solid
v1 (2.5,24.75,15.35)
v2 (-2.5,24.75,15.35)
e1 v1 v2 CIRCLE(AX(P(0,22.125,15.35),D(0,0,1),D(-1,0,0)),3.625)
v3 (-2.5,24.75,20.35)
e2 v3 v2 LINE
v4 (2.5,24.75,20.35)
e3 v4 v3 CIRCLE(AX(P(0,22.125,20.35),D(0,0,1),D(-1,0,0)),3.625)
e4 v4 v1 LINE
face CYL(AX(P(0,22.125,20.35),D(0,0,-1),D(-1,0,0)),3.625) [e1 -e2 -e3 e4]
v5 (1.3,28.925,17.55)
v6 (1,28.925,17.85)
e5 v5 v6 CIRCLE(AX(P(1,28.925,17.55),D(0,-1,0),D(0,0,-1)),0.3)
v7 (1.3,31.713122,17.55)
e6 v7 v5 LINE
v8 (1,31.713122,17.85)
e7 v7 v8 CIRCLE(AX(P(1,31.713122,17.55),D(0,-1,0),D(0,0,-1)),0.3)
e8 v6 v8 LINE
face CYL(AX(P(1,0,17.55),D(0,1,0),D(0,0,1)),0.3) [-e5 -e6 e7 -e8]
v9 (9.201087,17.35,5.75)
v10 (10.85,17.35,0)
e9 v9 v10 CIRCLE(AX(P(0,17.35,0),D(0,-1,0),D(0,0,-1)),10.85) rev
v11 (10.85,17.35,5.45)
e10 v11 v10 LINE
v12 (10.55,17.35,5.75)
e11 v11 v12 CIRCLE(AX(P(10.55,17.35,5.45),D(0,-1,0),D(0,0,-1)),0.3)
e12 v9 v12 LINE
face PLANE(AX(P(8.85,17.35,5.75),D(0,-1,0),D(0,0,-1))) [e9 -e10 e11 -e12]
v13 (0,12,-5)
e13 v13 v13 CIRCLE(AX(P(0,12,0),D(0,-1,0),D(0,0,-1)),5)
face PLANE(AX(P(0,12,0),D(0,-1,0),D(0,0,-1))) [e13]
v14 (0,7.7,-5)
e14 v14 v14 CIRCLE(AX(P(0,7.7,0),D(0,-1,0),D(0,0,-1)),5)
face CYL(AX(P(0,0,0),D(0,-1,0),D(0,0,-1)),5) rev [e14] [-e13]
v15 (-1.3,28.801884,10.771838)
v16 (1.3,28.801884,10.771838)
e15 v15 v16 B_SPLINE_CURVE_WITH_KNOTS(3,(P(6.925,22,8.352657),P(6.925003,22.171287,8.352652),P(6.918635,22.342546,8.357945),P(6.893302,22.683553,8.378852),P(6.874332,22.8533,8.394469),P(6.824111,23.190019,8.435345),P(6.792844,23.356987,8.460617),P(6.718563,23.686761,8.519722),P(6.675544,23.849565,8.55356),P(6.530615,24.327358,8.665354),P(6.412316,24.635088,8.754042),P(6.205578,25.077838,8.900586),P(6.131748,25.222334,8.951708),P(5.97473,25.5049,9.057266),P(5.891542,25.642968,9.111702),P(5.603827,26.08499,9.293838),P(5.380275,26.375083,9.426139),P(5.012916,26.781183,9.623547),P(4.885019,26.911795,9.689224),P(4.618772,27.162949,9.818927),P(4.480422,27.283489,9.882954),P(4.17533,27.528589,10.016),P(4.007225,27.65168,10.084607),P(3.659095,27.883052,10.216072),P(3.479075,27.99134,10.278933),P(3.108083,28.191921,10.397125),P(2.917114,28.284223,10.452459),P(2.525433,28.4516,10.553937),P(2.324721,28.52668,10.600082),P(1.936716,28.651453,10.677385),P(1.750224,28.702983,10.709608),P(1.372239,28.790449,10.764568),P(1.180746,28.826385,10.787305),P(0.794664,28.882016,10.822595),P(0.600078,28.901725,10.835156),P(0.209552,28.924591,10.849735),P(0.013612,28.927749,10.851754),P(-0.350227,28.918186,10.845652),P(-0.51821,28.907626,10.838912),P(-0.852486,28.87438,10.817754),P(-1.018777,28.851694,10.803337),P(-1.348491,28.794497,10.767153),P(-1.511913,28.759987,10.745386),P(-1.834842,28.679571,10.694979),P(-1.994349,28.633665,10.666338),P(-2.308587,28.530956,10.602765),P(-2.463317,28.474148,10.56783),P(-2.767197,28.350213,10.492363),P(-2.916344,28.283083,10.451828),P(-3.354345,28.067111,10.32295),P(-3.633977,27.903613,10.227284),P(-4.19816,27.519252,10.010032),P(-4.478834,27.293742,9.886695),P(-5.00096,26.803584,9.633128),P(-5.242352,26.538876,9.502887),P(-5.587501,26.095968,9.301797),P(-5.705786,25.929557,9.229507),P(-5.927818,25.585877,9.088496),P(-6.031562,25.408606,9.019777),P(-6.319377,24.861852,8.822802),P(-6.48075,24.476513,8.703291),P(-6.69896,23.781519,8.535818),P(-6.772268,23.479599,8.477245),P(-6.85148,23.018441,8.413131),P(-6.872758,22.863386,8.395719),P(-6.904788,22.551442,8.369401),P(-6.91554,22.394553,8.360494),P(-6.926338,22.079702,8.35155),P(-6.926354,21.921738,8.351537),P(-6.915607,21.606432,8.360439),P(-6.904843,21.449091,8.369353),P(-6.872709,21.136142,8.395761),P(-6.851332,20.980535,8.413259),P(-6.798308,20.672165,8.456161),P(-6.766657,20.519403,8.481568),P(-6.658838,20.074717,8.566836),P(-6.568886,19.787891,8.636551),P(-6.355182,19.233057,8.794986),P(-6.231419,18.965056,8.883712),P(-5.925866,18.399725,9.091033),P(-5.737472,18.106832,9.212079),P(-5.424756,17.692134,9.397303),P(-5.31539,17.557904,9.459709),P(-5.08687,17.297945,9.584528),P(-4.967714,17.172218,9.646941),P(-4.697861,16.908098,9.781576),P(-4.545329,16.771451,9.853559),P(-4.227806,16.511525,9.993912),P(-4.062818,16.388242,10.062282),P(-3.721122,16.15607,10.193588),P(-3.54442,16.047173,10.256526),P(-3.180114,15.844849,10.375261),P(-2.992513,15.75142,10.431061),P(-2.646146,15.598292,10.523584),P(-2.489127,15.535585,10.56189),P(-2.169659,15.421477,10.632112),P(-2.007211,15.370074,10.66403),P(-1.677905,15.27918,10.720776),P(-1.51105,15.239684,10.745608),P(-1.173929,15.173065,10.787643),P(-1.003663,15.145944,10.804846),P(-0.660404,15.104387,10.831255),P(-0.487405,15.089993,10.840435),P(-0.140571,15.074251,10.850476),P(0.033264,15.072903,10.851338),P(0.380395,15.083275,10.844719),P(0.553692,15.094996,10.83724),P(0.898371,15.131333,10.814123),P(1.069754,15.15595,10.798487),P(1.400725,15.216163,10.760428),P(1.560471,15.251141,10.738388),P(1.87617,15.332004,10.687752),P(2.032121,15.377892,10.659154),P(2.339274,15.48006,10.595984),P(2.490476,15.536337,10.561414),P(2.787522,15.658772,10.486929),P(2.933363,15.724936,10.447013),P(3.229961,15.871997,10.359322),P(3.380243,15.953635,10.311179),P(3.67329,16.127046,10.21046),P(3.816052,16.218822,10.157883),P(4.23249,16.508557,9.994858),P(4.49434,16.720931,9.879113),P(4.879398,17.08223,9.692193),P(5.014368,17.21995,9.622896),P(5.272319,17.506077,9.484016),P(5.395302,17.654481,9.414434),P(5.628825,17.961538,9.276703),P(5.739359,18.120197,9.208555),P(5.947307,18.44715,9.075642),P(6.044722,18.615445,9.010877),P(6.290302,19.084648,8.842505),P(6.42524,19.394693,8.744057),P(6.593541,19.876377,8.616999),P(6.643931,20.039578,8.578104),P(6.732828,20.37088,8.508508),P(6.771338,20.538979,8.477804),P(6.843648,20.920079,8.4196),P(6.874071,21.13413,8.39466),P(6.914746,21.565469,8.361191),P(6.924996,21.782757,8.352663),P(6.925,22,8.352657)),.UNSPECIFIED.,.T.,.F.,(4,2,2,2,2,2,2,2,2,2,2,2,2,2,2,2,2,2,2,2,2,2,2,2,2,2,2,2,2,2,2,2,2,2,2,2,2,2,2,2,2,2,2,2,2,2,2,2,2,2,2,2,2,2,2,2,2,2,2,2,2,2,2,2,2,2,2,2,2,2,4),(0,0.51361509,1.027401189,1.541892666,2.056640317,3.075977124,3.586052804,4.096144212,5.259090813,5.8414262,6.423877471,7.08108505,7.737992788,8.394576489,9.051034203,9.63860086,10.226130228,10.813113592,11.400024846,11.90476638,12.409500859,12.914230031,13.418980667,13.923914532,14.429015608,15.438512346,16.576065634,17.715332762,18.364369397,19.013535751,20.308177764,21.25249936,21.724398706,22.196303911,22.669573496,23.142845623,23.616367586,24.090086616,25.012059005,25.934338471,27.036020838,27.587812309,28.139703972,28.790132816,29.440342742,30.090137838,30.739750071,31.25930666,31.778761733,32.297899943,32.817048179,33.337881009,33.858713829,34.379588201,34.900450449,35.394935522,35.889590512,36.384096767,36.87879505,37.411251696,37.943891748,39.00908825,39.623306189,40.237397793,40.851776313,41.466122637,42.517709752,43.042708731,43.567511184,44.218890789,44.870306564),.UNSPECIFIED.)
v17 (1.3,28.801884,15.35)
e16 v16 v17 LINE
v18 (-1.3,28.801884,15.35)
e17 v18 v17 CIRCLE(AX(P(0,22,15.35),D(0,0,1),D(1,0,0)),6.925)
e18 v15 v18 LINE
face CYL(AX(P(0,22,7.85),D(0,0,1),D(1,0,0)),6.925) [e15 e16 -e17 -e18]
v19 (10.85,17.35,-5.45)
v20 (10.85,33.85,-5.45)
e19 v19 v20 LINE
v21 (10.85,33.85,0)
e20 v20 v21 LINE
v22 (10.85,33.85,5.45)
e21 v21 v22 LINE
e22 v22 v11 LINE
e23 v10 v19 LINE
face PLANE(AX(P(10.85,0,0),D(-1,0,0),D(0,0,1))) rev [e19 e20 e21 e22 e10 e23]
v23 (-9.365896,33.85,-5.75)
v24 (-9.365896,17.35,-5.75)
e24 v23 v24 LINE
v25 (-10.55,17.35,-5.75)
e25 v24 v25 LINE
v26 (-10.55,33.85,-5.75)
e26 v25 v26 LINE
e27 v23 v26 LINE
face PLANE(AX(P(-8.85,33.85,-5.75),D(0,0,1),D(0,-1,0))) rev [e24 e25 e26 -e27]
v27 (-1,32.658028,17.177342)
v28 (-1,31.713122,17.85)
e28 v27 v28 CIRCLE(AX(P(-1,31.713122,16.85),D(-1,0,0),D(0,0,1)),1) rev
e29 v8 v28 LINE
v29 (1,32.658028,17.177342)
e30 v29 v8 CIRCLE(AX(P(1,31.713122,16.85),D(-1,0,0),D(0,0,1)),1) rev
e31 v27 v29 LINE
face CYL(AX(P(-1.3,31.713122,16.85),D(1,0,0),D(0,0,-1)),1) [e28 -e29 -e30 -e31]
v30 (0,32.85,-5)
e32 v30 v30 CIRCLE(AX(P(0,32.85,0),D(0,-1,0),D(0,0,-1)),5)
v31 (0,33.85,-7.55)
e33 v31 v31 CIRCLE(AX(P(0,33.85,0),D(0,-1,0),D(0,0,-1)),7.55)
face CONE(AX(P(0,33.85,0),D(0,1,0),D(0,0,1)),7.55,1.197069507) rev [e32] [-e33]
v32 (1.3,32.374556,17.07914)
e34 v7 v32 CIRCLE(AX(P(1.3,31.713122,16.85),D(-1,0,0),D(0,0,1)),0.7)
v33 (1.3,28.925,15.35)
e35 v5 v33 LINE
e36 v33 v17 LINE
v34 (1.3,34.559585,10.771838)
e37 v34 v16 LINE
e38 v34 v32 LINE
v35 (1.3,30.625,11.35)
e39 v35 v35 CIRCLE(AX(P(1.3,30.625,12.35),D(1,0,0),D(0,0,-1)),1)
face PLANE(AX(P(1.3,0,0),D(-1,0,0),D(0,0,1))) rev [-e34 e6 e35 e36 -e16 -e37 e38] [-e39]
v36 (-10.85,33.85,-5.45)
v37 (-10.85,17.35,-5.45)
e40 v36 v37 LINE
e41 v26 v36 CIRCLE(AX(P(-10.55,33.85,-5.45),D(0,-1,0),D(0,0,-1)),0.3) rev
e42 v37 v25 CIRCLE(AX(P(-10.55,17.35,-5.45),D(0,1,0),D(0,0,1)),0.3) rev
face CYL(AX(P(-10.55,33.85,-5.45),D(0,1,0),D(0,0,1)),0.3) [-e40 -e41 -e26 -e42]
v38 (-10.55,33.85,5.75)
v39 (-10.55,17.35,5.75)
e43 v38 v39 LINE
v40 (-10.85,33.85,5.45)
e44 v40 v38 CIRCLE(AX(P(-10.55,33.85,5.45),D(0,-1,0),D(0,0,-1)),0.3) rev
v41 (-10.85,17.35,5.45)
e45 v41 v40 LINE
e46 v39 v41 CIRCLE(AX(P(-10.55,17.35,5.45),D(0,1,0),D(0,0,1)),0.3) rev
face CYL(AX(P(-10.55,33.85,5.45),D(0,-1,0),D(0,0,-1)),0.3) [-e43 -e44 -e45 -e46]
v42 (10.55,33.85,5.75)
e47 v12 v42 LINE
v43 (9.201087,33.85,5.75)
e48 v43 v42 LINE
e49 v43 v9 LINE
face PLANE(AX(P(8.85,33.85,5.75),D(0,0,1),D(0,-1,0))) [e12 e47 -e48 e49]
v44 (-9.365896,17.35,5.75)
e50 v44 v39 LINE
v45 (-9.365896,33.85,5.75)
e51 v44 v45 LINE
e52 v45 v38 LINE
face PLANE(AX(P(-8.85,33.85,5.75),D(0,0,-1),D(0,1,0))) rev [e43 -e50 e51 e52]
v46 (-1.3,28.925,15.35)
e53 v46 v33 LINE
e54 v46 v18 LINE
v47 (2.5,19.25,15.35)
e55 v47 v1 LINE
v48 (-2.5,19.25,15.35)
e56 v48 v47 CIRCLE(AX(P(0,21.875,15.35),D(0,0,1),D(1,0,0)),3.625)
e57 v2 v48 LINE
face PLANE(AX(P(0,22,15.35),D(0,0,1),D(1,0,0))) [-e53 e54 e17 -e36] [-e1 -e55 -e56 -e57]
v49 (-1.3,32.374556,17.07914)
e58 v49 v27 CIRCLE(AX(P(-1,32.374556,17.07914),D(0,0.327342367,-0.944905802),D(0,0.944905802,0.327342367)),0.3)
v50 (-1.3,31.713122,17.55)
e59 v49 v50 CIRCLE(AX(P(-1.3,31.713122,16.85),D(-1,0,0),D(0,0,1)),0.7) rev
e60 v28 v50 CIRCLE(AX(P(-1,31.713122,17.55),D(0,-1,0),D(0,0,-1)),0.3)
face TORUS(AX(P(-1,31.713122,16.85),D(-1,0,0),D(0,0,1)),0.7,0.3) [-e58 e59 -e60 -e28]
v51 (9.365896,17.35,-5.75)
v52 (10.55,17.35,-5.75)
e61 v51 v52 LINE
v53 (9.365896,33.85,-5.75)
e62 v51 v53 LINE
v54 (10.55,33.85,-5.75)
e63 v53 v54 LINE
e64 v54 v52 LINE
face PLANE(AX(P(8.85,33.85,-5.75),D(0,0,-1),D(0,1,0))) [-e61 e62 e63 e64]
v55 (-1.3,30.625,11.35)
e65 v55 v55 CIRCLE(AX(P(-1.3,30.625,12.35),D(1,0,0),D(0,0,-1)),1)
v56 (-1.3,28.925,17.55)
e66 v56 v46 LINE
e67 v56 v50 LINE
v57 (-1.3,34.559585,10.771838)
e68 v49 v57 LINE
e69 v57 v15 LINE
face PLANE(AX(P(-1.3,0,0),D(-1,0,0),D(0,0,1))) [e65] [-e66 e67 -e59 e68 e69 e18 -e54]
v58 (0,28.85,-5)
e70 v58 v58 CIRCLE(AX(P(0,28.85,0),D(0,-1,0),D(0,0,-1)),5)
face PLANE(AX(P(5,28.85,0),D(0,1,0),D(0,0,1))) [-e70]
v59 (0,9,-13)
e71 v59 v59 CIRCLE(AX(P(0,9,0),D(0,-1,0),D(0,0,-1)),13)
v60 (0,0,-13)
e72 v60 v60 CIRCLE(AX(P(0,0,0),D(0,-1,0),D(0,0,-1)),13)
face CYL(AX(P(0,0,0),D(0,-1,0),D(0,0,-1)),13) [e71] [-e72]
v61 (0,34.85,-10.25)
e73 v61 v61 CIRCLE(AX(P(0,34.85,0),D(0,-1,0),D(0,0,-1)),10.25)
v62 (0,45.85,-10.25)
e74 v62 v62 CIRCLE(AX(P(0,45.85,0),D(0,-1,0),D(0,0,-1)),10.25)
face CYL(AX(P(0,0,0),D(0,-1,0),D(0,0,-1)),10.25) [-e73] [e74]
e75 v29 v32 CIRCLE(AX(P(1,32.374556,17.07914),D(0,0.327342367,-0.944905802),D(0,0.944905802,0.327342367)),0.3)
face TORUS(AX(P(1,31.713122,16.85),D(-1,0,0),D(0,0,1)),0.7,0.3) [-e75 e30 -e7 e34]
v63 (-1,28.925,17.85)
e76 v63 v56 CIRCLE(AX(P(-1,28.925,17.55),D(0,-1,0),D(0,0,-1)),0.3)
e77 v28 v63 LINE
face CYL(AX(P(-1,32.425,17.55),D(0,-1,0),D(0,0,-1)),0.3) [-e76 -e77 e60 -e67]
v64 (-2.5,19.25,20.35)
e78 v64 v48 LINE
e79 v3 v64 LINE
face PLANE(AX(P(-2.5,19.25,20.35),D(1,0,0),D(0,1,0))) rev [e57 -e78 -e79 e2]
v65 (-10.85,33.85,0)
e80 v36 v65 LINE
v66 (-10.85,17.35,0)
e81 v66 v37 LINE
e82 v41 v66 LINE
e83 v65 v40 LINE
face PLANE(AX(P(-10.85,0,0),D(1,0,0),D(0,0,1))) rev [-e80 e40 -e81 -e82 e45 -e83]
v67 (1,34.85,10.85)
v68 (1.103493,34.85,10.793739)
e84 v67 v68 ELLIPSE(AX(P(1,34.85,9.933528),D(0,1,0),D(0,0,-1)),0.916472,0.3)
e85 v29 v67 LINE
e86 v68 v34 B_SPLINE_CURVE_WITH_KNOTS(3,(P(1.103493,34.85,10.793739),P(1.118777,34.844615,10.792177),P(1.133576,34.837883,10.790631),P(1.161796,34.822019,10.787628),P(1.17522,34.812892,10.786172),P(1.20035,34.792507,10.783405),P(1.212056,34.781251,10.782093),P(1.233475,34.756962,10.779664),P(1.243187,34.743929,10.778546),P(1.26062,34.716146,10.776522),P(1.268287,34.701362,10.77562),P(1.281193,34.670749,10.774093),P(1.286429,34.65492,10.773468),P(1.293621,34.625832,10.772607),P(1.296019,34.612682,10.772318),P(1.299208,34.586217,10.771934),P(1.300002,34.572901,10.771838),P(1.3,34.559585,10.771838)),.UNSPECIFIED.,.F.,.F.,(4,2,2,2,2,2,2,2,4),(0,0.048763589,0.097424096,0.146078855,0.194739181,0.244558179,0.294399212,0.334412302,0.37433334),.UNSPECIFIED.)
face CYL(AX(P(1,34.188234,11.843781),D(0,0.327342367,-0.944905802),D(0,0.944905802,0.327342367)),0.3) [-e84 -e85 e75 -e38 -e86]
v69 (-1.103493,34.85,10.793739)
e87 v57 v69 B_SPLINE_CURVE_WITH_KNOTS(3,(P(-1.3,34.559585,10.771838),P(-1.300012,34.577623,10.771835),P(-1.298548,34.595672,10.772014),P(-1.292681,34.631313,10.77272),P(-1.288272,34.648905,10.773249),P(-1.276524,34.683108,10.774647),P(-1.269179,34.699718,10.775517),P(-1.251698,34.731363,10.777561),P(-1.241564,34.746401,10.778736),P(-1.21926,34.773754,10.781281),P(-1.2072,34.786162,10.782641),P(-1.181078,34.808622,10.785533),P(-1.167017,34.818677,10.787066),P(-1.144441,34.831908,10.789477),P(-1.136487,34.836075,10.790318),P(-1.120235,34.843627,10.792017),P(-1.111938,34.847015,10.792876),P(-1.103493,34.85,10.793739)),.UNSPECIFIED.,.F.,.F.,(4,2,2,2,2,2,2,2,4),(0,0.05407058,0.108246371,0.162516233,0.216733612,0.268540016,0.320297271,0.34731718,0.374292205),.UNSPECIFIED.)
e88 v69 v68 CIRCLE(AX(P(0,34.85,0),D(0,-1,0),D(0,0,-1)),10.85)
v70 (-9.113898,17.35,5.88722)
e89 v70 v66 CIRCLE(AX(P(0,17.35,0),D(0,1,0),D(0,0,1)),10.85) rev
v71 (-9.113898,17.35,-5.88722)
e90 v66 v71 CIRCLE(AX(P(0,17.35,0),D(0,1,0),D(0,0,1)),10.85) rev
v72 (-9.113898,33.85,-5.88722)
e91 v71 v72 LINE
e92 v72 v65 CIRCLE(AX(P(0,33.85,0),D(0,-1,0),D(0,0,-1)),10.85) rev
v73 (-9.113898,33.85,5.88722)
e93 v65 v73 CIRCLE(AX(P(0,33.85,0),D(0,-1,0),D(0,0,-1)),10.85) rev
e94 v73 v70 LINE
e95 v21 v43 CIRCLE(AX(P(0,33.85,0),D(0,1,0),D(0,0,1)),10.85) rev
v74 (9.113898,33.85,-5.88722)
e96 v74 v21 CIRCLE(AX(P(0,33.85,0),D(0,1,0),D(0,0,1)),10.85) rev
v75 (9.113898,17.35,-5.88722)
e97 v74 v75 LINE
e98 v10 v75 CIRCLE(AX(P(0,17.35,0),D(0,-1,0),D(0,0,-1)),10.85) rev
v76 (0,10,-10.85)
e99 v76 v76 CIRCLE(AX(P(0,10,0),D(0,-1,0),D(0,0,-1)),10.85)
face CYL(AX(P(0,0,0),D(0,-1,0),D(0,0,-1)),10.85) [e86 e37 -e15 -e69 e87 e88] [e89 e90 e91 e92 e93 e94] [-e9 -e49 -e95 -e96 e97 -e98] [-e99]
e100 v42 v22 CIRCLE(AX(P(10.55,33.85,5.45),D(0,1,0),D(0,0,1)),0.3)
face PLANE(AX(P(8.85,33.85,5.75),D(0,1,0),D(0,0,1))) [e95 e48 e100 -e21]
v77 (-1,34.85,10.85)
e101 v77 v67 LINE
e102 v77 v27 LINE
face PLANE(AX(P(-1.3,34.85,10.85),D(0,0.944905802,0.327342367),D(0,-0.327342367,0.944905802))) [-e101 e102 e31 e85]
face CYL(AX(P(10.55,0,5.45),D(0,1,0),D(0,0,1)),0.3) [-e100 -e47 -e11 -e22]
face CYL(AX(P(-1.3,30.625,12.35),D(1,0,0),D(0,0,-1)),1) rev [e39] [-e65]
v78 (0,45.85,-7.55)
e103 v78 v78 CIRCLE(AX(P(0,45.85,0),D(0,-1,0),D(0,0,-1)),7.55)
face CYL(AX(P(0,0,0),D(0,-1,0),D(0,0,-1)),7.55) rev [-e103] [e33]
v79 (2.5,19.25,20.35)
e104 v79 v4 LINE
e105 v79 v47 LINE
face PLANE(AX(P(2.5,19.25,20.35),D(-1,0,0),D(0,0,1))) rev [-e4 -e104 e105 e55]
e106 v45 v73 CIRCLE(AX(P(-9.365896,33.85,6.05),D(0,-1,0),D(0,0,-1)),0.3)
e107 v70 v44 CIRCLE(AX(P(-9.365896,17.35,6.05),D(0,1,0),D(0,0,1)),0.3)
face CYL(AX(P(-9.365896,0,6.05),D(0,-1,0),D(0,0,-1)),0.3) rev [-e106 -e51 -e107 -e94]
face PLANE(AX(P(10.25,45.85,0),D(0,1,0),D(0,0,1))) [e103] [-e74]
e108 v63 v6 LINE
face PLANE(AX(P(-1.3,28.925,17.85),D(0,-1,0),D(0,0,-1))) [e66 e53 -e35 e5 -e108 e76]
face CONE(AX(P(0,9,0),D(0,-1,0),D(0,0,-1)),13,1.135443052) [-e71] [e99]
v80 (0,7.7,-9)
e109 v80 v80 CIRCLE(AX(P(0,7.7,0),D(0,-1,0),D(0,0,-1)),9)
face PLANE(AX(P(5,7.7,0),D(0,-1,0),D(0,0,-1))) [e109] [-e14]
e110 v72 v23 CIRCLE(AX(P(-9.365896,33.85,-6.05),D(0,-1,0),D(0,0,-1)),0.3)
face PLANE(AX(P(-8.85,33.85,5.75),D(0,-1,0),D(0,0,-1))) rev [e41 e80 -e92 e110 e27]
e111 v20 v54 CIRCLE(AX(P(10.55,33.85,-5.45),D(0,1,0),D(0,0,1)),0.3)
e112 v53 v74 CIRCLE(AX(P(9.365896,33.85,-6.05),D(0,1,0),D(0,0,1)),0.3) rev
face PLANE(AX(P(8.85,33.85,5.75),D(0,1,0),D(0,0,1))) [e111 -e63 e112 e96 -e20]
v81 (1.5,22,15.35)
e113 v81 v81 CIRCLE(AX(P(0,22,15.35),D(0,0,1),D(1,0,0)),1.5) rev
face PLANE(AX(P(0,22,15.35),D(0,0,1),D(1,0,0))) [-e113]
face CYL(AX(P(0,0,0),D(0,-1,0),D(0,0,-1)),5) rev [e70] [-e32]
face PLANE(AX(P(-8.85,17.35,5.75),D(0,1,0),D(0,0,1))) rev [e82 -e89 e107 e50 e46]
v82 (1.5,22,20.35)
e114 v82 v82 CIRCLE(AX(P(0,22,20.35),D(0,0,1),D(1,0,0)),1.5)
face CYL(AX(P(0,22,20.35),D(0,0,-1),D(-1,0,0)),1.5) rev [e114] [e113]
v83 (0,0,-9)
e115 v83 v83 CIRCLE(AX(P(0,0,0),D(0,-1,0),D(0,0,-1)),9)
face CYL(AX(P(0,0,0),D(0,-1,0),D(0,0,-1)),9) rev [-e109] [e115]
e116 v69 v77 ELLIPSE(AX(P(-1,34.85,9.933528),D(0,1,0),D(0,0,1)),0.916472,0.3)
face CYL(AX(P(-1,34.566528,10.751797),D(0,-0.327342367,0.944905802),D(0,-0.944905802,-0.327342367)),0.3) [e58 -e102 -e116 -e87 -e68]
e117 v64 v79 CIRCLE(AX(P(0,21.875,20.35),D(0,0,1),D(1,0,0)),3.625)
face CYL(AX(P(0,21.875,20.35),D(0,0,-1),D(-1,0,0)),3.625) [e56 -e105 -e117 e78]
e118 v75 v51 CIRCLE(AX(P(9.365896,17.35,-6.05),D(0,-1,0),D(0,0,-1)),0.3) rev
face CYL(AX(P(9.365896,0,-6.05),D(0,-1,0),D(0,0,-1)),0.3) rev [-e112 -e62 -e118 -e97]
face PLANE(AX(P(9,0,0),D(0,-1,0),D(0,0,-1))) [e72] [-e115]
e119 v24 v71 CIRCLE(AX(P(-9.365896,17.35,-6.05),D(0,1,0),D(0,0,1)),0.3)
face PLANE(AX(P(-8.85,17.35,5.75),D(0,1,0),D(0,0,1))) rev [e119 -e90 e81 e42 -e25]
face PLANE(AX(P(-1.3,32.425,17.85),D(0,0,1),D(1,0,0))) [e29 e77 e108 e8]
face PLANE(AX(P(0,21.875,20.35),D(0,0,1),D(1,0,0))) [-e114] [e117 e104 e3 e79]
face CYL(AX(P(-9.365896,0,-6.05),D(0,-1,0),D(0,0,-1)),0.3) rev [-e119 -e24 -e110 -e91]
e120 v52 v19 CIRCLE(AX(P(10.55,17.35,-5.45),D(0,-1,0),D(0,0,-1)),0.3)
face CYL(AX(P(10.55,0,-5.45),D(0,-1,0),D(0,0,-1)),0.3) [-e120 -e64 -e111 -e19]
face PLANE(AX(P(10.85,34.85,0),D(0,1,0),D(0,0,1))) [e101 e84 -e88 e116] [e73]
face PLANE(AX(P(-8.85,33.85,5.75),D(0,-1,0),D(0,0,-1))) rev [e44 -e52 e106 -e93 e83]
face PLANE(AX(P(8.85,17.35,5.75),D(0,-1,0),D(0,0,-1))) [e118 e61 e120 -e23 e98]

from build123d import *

# Parameters (mm, degrees)
SKETCH2_W                = 16.5
SKETCH2_H                = 11.5
BOSS_EXTRUDE1_DEPTH      = 2
BOSS_EXTRUDE2_DEPTH      = 4.5
BOSS_EXTRUDE2_DEPTH_BACK = 3
SKETCH3_R                = 6.925
BOSS_EXTRUDE6_DEPTH      = 1.3
BOSS_EXTRUDE6_DEPTH_BACK = 1.3
SKETCH4_R                = 1
FILLET2_R                = 0.3
FILLET4_R                = 0.3
FILLET7_R                = 0.3
FILLET8_R                = 0.3
FILLET9_R                = 0.3
FILLET10_R               = 0.3
FILLET11_R               = 0.3
FILLET12_R               = 0.3
SKETCH5_R                = 1.5
BOSS_EXTRUDE7_DEPTH      = 5
FILLET13_R               = 1


with BuildPart() as part:
    # Sketch1 → Revolve1 (revolve)
    with BuildSketch(Plane.XY, mode=Mode.PRIVATE) as revolve1_sk:
        Polygon((7.55, 45.85), (7.55, 33.85), (5, 32.85), (5, 28.85), (0, 28.85), (0, 12), (5, 12), (5, 7.7), (9, 7.7), (9, 0), (13, 0), (13, 9), (10.85, 10), (10.85, 34.85), (10.25, 34.85), (10.25, 45.85), align=None)
    revolve(revolve1_sk.sketch.rotate(Axis((0, 0, 0), (0, 1, 0)), 90), axis=Axis((0, 0, 0), (0, 1, 0)))

    # Sketch2 → Boss-Extrude1 (add)
    with BuildSketch(Plane.YZ.offset(10.85)):
        with Locations((25.6, 0)):
            Rectangle(SKETCH2_W, SKETCH2_H)
    boss_extrude1 = extrude(amount=-BOSS_EXTRUDE1_DEPTH)

    # Mirror1: Boss-Extrude1 across plane
    add(boss_extrude1.mirror(Plane(origin=(0, 0, 0), x_dir=(0, 0, 1), z_dir=(1, 0, 0))))

    # Sketch3 → Boss-Extrude2 (add, two sides: drawn at the far end of the back side and taken through both)
    with BuildSketch(Plane(origin=(0, 0, 10.85), x_dir=(0, -1, 0), z_dir=(0, 0, 1)).offset(-BOSS_EXTRUDE2_DEPTH_BACK)):
        with Locations(Location((-22, 0, 0), (0, 0, 90))):
            Circle(SKETCH3_R)
    extrude(amount=BOSS_EXTRUDE2_DEPTH + BOSS_EXTRUDE2_DEPTH_BACK)

    # Sketch4 → Boss-Extrude6 (add, two sides: drawn at the far end of the back side and taken through both)
    with BuildSketch(Plane(origin=(0, 0, 0), x_dir=(0, 0, -1), z_dir=(1, 0, 0)).offset(-BOSS_EXTRUDE6_DEPTH_BACK)):
        Polygon((-10.85, 34.85), (-17.85, 32.425), (-17.85, 28.925), (-15.35, 28.925), (-15.35, 27.925), (-10.25, 27.925), (-10.25, 34.85), align=None)
        with Locations((-12.35, 30.625)):
            Circle(SKETCH4_R, mode=Mode.SUBTRACT)
    extrude(amount=BOSS_EXTRUDE6_DEPTH + BOSS_EXTRUDE6_DEPTH_BACK)

    # Fillet2
    fillet2_edges = [part.edges().sort_by_distance(p)[0] for p in [
        (-9.201086892, 25.6, 5.75),
    ]]
    fillet(fillet2_edges, radius=FILLET2_R)

    # Fillet4
    fillet4_edges = [part.edges().sort_by_distance(p)[0] for p in [
        (10.85, 25.6, 5.75),
    ]]
    fillet(fillet4_edges, radius=FILLET4_R)

    # Fillet7
    fillet7_edges = [part.edges().sort_by_distance(p)[0] for p in [
        (10.85, 25.6, -5.75),
    ]]
    fillet(fillet7_edges, radius=FILLET7_R)

    # Fillet8
    fillet8_edges = [part.edges().sort_by_distance(p)[0] for p in [
        (-10.85, 25.6, -5.75),
    ]]
    fillet(fillet8_edges, radius=FILLET8_R)

    # Fillet9
    fillet9_edges = [part.edges().sort_by_distance(p)[0] for p in [
        (-10.85, 25.6, 5.75),
    ]]
    fillet(fillet9_edges, radius=FILLET9_R)

    # Fillet10
    # the kernel refuses this fillet: 0.3 mm, written as the material it takes off along each edge
    with BuildSketch(Plane(origin=(1.3, 33.175, 17.85), x_dir=(0, 0, -1), z_dir=(0, -1, 0))) as fillet10_piece_1:
        with BuildLine():
            CenterArc((FILLET10_R, -FILLET10_R), FILLET10_R, 90, 90)
            Line((0, -FILLET10_R), (0, 0))
            Line((0, 0), (FILLET10_R, 0))
        make_face()
    extrude(amount=5, mode=Mode.SUBTRACT)
    with BuildSketch(Plane(origin=(-1.3, 35.095506775, 10.141320648), x_dir=(0, -0.9449058020160995, -0.3273423671270065), z_dir=(0, -0.3273423671270065, 0.9449058020160995))) as fillet10_piece_2_section:
        with BuildLine():
            CenterArc((FILLET10_R, FILLET10_R), FILLET10_R, 180, 90)
            Line((0, FILLET10_R), (0, 0))
            Line((0, 0), (FILLET10_R, 0))
        make_face()
    fillet10_piece_2 = extrude(amount=8.908145854, mode=Mode.PRIVATE)
    fillet10_piece_2 = fillet10_piece_2 - Plane(origin=(0, 33.459049613, 0), x_dir=(0, 0, -1), z_dir=(0, 1, 0)) * Cylinder(10.85, 20, mode=Mode.PRIVATE)
    add(fillet10_piece_2, mode=Mode.SUBTRACT)
    with BuildSketch(Plane(origin=(-1.3, 33.175, 17.85), x_dir=(0, 0, -1), z_dir=(0, -1, 0))) as fillet10_piece_3:
        with BuildLine():
            CenterArc((FILLET10_R, FILLET10_R), FILLET10_R, 180, 90)
            Line((0, FILLET10_R), (0, 0))
            Line((0, 0), (FILLET10_R, 0))
        make_face()
    extrude(amount=5, mode=Mode.SUBTRACT)
    with BuildSketch(Plane(origin=(1.3, 35.095506775, 10.141320648), x_dir=(0, -0.9449058020160995, -0.3273423671270065), z_dir=(0, -0.3273423671270065, 0.9449058020160995))) as fillet10_piece_4_section:
        with BuildLine():
            CenterArc((FILLET10_R, -FILLET10_R), FILLET10_R, 90, 90)
            Line((0, -FILLET10_R), (0, 0))
            Line((0, 0), (FILLET10_R, 0))
        make_face()
    fillet10_piece_4 = extrude(amount=8.908145854, mode=Mode.PRIVATE)
    fillet10_piece_4 = fillet10_piece_4 - Plane(origin=(0, 33.459049613, 0), x_dir=(0, 0, -1), z_dir=(0, 1, 0)) * Cylinder(10.85, 20, mode=Mode.PRIVATE)
    add(fillet10_piece_4, mode=Mode.SUBTRACT)

    # Fillet11
    fillet11_edges = [part.edges().sort_by_distance(p)[0] for p in [
        (9.201086892, 25.6, -5.75),
    ]]
    fillet(fillet11_edges, radius=FILLET11_R)

    # Fillet12
    fillet12_edges = [part.edges().sort_by_distance(p)[0] for p in [
        (-9.201086892, 25.6, -5.75),
    ]]
    fillet(fillet12_edges, radius=FILLET12_R)

    # Sketch5 → Boss-Extrude7 (add)
    with BuildSketch(Plane.XY.offset(15.35)):
        with BuildLine():
            Line((-2.5, 19.25), (-2.5, 24.75))
            ThreePointArc((-2.5, 24.75), (0, 25.75), (2.5, 24.75))
            Line((2.5, 24.75), (2.5, 19.25))
            ThreePointArc((2.5, 19.25), (0, 18.25), (-2.5, 19.25))
        make_face()
        with Locations((0, 22)):
            Circle(SKETCH5_R, mode=Mode.SUBTRACT)
    extrude(amount=BOSS_EXTRUDE7_DEPTH)

    # Fillet13
    # the kernel refuses this fillet: 1 mm, written as the material it takes off along each edge
    with BuildSketch(Plane(origin=(-1.3, 31.713122021, 16.85), x_dir=(0, 0, 1), z_dir=(0, -1, 0))) as fillet13_piece_1:
        with BuildLine():
            CenterArc((0.7, -0.3), 0.3, 0, 90)
            Line((1, -0.3), (1, 0))
            Line((1, 0), (0.7, 0))
        make_face()
    revolve(axis=Axis((-1.3, 31.713122021, 16.85), (-1, 0, 0)), revolution_arc=70.892452859, mode=Mode.SUBTRACT)
    with BuildSketch(Plane(origin=(1.3, 31.713122021, 16.85), x_dir=(0, 0.9449058020160994, 0.32734236712700643), z_dir=(0, 0.32734236712700643, -0.9449058020160994))) as fillet13_piece_2:
        with BuildLine():
            CenterArc((0.7, -0.3), 0.3, 0, 90)
            Line((1, -0.3), (1, 0))
            Line((1, 0), (0.7, 0))
        make_face()
    revolve(axis=Axis((1.3, 31.713122021, 16.85), (1, 0, 0)), revolution_arc=70.892452859, mode=Mode.SUBTRACT)
    with BuildSketch(Plane(origin=(-1.3, 32.425, 17.85), x_dir=(0, 0.32734236712700615, -0.9449058020160995), z_dir=(1, 0, 0))) as fillet13_piece_3:
        with BuildLine():
            CenterArc((FILLET13_R * 0.711877979199, -FILLET13_R), FILLET13_R, 90, 70.892452859)
            Line((-FILLET13_R * 0.233027822817, -FILLET13_R * 0.672657632873), (0, 0))
            Line((0, 0), (FILLET13_R * 0.711877979199, 0))
        make_face()
    extrude(amount=2.6, mode=Mode.SUBTRACT)


solid = part.part
